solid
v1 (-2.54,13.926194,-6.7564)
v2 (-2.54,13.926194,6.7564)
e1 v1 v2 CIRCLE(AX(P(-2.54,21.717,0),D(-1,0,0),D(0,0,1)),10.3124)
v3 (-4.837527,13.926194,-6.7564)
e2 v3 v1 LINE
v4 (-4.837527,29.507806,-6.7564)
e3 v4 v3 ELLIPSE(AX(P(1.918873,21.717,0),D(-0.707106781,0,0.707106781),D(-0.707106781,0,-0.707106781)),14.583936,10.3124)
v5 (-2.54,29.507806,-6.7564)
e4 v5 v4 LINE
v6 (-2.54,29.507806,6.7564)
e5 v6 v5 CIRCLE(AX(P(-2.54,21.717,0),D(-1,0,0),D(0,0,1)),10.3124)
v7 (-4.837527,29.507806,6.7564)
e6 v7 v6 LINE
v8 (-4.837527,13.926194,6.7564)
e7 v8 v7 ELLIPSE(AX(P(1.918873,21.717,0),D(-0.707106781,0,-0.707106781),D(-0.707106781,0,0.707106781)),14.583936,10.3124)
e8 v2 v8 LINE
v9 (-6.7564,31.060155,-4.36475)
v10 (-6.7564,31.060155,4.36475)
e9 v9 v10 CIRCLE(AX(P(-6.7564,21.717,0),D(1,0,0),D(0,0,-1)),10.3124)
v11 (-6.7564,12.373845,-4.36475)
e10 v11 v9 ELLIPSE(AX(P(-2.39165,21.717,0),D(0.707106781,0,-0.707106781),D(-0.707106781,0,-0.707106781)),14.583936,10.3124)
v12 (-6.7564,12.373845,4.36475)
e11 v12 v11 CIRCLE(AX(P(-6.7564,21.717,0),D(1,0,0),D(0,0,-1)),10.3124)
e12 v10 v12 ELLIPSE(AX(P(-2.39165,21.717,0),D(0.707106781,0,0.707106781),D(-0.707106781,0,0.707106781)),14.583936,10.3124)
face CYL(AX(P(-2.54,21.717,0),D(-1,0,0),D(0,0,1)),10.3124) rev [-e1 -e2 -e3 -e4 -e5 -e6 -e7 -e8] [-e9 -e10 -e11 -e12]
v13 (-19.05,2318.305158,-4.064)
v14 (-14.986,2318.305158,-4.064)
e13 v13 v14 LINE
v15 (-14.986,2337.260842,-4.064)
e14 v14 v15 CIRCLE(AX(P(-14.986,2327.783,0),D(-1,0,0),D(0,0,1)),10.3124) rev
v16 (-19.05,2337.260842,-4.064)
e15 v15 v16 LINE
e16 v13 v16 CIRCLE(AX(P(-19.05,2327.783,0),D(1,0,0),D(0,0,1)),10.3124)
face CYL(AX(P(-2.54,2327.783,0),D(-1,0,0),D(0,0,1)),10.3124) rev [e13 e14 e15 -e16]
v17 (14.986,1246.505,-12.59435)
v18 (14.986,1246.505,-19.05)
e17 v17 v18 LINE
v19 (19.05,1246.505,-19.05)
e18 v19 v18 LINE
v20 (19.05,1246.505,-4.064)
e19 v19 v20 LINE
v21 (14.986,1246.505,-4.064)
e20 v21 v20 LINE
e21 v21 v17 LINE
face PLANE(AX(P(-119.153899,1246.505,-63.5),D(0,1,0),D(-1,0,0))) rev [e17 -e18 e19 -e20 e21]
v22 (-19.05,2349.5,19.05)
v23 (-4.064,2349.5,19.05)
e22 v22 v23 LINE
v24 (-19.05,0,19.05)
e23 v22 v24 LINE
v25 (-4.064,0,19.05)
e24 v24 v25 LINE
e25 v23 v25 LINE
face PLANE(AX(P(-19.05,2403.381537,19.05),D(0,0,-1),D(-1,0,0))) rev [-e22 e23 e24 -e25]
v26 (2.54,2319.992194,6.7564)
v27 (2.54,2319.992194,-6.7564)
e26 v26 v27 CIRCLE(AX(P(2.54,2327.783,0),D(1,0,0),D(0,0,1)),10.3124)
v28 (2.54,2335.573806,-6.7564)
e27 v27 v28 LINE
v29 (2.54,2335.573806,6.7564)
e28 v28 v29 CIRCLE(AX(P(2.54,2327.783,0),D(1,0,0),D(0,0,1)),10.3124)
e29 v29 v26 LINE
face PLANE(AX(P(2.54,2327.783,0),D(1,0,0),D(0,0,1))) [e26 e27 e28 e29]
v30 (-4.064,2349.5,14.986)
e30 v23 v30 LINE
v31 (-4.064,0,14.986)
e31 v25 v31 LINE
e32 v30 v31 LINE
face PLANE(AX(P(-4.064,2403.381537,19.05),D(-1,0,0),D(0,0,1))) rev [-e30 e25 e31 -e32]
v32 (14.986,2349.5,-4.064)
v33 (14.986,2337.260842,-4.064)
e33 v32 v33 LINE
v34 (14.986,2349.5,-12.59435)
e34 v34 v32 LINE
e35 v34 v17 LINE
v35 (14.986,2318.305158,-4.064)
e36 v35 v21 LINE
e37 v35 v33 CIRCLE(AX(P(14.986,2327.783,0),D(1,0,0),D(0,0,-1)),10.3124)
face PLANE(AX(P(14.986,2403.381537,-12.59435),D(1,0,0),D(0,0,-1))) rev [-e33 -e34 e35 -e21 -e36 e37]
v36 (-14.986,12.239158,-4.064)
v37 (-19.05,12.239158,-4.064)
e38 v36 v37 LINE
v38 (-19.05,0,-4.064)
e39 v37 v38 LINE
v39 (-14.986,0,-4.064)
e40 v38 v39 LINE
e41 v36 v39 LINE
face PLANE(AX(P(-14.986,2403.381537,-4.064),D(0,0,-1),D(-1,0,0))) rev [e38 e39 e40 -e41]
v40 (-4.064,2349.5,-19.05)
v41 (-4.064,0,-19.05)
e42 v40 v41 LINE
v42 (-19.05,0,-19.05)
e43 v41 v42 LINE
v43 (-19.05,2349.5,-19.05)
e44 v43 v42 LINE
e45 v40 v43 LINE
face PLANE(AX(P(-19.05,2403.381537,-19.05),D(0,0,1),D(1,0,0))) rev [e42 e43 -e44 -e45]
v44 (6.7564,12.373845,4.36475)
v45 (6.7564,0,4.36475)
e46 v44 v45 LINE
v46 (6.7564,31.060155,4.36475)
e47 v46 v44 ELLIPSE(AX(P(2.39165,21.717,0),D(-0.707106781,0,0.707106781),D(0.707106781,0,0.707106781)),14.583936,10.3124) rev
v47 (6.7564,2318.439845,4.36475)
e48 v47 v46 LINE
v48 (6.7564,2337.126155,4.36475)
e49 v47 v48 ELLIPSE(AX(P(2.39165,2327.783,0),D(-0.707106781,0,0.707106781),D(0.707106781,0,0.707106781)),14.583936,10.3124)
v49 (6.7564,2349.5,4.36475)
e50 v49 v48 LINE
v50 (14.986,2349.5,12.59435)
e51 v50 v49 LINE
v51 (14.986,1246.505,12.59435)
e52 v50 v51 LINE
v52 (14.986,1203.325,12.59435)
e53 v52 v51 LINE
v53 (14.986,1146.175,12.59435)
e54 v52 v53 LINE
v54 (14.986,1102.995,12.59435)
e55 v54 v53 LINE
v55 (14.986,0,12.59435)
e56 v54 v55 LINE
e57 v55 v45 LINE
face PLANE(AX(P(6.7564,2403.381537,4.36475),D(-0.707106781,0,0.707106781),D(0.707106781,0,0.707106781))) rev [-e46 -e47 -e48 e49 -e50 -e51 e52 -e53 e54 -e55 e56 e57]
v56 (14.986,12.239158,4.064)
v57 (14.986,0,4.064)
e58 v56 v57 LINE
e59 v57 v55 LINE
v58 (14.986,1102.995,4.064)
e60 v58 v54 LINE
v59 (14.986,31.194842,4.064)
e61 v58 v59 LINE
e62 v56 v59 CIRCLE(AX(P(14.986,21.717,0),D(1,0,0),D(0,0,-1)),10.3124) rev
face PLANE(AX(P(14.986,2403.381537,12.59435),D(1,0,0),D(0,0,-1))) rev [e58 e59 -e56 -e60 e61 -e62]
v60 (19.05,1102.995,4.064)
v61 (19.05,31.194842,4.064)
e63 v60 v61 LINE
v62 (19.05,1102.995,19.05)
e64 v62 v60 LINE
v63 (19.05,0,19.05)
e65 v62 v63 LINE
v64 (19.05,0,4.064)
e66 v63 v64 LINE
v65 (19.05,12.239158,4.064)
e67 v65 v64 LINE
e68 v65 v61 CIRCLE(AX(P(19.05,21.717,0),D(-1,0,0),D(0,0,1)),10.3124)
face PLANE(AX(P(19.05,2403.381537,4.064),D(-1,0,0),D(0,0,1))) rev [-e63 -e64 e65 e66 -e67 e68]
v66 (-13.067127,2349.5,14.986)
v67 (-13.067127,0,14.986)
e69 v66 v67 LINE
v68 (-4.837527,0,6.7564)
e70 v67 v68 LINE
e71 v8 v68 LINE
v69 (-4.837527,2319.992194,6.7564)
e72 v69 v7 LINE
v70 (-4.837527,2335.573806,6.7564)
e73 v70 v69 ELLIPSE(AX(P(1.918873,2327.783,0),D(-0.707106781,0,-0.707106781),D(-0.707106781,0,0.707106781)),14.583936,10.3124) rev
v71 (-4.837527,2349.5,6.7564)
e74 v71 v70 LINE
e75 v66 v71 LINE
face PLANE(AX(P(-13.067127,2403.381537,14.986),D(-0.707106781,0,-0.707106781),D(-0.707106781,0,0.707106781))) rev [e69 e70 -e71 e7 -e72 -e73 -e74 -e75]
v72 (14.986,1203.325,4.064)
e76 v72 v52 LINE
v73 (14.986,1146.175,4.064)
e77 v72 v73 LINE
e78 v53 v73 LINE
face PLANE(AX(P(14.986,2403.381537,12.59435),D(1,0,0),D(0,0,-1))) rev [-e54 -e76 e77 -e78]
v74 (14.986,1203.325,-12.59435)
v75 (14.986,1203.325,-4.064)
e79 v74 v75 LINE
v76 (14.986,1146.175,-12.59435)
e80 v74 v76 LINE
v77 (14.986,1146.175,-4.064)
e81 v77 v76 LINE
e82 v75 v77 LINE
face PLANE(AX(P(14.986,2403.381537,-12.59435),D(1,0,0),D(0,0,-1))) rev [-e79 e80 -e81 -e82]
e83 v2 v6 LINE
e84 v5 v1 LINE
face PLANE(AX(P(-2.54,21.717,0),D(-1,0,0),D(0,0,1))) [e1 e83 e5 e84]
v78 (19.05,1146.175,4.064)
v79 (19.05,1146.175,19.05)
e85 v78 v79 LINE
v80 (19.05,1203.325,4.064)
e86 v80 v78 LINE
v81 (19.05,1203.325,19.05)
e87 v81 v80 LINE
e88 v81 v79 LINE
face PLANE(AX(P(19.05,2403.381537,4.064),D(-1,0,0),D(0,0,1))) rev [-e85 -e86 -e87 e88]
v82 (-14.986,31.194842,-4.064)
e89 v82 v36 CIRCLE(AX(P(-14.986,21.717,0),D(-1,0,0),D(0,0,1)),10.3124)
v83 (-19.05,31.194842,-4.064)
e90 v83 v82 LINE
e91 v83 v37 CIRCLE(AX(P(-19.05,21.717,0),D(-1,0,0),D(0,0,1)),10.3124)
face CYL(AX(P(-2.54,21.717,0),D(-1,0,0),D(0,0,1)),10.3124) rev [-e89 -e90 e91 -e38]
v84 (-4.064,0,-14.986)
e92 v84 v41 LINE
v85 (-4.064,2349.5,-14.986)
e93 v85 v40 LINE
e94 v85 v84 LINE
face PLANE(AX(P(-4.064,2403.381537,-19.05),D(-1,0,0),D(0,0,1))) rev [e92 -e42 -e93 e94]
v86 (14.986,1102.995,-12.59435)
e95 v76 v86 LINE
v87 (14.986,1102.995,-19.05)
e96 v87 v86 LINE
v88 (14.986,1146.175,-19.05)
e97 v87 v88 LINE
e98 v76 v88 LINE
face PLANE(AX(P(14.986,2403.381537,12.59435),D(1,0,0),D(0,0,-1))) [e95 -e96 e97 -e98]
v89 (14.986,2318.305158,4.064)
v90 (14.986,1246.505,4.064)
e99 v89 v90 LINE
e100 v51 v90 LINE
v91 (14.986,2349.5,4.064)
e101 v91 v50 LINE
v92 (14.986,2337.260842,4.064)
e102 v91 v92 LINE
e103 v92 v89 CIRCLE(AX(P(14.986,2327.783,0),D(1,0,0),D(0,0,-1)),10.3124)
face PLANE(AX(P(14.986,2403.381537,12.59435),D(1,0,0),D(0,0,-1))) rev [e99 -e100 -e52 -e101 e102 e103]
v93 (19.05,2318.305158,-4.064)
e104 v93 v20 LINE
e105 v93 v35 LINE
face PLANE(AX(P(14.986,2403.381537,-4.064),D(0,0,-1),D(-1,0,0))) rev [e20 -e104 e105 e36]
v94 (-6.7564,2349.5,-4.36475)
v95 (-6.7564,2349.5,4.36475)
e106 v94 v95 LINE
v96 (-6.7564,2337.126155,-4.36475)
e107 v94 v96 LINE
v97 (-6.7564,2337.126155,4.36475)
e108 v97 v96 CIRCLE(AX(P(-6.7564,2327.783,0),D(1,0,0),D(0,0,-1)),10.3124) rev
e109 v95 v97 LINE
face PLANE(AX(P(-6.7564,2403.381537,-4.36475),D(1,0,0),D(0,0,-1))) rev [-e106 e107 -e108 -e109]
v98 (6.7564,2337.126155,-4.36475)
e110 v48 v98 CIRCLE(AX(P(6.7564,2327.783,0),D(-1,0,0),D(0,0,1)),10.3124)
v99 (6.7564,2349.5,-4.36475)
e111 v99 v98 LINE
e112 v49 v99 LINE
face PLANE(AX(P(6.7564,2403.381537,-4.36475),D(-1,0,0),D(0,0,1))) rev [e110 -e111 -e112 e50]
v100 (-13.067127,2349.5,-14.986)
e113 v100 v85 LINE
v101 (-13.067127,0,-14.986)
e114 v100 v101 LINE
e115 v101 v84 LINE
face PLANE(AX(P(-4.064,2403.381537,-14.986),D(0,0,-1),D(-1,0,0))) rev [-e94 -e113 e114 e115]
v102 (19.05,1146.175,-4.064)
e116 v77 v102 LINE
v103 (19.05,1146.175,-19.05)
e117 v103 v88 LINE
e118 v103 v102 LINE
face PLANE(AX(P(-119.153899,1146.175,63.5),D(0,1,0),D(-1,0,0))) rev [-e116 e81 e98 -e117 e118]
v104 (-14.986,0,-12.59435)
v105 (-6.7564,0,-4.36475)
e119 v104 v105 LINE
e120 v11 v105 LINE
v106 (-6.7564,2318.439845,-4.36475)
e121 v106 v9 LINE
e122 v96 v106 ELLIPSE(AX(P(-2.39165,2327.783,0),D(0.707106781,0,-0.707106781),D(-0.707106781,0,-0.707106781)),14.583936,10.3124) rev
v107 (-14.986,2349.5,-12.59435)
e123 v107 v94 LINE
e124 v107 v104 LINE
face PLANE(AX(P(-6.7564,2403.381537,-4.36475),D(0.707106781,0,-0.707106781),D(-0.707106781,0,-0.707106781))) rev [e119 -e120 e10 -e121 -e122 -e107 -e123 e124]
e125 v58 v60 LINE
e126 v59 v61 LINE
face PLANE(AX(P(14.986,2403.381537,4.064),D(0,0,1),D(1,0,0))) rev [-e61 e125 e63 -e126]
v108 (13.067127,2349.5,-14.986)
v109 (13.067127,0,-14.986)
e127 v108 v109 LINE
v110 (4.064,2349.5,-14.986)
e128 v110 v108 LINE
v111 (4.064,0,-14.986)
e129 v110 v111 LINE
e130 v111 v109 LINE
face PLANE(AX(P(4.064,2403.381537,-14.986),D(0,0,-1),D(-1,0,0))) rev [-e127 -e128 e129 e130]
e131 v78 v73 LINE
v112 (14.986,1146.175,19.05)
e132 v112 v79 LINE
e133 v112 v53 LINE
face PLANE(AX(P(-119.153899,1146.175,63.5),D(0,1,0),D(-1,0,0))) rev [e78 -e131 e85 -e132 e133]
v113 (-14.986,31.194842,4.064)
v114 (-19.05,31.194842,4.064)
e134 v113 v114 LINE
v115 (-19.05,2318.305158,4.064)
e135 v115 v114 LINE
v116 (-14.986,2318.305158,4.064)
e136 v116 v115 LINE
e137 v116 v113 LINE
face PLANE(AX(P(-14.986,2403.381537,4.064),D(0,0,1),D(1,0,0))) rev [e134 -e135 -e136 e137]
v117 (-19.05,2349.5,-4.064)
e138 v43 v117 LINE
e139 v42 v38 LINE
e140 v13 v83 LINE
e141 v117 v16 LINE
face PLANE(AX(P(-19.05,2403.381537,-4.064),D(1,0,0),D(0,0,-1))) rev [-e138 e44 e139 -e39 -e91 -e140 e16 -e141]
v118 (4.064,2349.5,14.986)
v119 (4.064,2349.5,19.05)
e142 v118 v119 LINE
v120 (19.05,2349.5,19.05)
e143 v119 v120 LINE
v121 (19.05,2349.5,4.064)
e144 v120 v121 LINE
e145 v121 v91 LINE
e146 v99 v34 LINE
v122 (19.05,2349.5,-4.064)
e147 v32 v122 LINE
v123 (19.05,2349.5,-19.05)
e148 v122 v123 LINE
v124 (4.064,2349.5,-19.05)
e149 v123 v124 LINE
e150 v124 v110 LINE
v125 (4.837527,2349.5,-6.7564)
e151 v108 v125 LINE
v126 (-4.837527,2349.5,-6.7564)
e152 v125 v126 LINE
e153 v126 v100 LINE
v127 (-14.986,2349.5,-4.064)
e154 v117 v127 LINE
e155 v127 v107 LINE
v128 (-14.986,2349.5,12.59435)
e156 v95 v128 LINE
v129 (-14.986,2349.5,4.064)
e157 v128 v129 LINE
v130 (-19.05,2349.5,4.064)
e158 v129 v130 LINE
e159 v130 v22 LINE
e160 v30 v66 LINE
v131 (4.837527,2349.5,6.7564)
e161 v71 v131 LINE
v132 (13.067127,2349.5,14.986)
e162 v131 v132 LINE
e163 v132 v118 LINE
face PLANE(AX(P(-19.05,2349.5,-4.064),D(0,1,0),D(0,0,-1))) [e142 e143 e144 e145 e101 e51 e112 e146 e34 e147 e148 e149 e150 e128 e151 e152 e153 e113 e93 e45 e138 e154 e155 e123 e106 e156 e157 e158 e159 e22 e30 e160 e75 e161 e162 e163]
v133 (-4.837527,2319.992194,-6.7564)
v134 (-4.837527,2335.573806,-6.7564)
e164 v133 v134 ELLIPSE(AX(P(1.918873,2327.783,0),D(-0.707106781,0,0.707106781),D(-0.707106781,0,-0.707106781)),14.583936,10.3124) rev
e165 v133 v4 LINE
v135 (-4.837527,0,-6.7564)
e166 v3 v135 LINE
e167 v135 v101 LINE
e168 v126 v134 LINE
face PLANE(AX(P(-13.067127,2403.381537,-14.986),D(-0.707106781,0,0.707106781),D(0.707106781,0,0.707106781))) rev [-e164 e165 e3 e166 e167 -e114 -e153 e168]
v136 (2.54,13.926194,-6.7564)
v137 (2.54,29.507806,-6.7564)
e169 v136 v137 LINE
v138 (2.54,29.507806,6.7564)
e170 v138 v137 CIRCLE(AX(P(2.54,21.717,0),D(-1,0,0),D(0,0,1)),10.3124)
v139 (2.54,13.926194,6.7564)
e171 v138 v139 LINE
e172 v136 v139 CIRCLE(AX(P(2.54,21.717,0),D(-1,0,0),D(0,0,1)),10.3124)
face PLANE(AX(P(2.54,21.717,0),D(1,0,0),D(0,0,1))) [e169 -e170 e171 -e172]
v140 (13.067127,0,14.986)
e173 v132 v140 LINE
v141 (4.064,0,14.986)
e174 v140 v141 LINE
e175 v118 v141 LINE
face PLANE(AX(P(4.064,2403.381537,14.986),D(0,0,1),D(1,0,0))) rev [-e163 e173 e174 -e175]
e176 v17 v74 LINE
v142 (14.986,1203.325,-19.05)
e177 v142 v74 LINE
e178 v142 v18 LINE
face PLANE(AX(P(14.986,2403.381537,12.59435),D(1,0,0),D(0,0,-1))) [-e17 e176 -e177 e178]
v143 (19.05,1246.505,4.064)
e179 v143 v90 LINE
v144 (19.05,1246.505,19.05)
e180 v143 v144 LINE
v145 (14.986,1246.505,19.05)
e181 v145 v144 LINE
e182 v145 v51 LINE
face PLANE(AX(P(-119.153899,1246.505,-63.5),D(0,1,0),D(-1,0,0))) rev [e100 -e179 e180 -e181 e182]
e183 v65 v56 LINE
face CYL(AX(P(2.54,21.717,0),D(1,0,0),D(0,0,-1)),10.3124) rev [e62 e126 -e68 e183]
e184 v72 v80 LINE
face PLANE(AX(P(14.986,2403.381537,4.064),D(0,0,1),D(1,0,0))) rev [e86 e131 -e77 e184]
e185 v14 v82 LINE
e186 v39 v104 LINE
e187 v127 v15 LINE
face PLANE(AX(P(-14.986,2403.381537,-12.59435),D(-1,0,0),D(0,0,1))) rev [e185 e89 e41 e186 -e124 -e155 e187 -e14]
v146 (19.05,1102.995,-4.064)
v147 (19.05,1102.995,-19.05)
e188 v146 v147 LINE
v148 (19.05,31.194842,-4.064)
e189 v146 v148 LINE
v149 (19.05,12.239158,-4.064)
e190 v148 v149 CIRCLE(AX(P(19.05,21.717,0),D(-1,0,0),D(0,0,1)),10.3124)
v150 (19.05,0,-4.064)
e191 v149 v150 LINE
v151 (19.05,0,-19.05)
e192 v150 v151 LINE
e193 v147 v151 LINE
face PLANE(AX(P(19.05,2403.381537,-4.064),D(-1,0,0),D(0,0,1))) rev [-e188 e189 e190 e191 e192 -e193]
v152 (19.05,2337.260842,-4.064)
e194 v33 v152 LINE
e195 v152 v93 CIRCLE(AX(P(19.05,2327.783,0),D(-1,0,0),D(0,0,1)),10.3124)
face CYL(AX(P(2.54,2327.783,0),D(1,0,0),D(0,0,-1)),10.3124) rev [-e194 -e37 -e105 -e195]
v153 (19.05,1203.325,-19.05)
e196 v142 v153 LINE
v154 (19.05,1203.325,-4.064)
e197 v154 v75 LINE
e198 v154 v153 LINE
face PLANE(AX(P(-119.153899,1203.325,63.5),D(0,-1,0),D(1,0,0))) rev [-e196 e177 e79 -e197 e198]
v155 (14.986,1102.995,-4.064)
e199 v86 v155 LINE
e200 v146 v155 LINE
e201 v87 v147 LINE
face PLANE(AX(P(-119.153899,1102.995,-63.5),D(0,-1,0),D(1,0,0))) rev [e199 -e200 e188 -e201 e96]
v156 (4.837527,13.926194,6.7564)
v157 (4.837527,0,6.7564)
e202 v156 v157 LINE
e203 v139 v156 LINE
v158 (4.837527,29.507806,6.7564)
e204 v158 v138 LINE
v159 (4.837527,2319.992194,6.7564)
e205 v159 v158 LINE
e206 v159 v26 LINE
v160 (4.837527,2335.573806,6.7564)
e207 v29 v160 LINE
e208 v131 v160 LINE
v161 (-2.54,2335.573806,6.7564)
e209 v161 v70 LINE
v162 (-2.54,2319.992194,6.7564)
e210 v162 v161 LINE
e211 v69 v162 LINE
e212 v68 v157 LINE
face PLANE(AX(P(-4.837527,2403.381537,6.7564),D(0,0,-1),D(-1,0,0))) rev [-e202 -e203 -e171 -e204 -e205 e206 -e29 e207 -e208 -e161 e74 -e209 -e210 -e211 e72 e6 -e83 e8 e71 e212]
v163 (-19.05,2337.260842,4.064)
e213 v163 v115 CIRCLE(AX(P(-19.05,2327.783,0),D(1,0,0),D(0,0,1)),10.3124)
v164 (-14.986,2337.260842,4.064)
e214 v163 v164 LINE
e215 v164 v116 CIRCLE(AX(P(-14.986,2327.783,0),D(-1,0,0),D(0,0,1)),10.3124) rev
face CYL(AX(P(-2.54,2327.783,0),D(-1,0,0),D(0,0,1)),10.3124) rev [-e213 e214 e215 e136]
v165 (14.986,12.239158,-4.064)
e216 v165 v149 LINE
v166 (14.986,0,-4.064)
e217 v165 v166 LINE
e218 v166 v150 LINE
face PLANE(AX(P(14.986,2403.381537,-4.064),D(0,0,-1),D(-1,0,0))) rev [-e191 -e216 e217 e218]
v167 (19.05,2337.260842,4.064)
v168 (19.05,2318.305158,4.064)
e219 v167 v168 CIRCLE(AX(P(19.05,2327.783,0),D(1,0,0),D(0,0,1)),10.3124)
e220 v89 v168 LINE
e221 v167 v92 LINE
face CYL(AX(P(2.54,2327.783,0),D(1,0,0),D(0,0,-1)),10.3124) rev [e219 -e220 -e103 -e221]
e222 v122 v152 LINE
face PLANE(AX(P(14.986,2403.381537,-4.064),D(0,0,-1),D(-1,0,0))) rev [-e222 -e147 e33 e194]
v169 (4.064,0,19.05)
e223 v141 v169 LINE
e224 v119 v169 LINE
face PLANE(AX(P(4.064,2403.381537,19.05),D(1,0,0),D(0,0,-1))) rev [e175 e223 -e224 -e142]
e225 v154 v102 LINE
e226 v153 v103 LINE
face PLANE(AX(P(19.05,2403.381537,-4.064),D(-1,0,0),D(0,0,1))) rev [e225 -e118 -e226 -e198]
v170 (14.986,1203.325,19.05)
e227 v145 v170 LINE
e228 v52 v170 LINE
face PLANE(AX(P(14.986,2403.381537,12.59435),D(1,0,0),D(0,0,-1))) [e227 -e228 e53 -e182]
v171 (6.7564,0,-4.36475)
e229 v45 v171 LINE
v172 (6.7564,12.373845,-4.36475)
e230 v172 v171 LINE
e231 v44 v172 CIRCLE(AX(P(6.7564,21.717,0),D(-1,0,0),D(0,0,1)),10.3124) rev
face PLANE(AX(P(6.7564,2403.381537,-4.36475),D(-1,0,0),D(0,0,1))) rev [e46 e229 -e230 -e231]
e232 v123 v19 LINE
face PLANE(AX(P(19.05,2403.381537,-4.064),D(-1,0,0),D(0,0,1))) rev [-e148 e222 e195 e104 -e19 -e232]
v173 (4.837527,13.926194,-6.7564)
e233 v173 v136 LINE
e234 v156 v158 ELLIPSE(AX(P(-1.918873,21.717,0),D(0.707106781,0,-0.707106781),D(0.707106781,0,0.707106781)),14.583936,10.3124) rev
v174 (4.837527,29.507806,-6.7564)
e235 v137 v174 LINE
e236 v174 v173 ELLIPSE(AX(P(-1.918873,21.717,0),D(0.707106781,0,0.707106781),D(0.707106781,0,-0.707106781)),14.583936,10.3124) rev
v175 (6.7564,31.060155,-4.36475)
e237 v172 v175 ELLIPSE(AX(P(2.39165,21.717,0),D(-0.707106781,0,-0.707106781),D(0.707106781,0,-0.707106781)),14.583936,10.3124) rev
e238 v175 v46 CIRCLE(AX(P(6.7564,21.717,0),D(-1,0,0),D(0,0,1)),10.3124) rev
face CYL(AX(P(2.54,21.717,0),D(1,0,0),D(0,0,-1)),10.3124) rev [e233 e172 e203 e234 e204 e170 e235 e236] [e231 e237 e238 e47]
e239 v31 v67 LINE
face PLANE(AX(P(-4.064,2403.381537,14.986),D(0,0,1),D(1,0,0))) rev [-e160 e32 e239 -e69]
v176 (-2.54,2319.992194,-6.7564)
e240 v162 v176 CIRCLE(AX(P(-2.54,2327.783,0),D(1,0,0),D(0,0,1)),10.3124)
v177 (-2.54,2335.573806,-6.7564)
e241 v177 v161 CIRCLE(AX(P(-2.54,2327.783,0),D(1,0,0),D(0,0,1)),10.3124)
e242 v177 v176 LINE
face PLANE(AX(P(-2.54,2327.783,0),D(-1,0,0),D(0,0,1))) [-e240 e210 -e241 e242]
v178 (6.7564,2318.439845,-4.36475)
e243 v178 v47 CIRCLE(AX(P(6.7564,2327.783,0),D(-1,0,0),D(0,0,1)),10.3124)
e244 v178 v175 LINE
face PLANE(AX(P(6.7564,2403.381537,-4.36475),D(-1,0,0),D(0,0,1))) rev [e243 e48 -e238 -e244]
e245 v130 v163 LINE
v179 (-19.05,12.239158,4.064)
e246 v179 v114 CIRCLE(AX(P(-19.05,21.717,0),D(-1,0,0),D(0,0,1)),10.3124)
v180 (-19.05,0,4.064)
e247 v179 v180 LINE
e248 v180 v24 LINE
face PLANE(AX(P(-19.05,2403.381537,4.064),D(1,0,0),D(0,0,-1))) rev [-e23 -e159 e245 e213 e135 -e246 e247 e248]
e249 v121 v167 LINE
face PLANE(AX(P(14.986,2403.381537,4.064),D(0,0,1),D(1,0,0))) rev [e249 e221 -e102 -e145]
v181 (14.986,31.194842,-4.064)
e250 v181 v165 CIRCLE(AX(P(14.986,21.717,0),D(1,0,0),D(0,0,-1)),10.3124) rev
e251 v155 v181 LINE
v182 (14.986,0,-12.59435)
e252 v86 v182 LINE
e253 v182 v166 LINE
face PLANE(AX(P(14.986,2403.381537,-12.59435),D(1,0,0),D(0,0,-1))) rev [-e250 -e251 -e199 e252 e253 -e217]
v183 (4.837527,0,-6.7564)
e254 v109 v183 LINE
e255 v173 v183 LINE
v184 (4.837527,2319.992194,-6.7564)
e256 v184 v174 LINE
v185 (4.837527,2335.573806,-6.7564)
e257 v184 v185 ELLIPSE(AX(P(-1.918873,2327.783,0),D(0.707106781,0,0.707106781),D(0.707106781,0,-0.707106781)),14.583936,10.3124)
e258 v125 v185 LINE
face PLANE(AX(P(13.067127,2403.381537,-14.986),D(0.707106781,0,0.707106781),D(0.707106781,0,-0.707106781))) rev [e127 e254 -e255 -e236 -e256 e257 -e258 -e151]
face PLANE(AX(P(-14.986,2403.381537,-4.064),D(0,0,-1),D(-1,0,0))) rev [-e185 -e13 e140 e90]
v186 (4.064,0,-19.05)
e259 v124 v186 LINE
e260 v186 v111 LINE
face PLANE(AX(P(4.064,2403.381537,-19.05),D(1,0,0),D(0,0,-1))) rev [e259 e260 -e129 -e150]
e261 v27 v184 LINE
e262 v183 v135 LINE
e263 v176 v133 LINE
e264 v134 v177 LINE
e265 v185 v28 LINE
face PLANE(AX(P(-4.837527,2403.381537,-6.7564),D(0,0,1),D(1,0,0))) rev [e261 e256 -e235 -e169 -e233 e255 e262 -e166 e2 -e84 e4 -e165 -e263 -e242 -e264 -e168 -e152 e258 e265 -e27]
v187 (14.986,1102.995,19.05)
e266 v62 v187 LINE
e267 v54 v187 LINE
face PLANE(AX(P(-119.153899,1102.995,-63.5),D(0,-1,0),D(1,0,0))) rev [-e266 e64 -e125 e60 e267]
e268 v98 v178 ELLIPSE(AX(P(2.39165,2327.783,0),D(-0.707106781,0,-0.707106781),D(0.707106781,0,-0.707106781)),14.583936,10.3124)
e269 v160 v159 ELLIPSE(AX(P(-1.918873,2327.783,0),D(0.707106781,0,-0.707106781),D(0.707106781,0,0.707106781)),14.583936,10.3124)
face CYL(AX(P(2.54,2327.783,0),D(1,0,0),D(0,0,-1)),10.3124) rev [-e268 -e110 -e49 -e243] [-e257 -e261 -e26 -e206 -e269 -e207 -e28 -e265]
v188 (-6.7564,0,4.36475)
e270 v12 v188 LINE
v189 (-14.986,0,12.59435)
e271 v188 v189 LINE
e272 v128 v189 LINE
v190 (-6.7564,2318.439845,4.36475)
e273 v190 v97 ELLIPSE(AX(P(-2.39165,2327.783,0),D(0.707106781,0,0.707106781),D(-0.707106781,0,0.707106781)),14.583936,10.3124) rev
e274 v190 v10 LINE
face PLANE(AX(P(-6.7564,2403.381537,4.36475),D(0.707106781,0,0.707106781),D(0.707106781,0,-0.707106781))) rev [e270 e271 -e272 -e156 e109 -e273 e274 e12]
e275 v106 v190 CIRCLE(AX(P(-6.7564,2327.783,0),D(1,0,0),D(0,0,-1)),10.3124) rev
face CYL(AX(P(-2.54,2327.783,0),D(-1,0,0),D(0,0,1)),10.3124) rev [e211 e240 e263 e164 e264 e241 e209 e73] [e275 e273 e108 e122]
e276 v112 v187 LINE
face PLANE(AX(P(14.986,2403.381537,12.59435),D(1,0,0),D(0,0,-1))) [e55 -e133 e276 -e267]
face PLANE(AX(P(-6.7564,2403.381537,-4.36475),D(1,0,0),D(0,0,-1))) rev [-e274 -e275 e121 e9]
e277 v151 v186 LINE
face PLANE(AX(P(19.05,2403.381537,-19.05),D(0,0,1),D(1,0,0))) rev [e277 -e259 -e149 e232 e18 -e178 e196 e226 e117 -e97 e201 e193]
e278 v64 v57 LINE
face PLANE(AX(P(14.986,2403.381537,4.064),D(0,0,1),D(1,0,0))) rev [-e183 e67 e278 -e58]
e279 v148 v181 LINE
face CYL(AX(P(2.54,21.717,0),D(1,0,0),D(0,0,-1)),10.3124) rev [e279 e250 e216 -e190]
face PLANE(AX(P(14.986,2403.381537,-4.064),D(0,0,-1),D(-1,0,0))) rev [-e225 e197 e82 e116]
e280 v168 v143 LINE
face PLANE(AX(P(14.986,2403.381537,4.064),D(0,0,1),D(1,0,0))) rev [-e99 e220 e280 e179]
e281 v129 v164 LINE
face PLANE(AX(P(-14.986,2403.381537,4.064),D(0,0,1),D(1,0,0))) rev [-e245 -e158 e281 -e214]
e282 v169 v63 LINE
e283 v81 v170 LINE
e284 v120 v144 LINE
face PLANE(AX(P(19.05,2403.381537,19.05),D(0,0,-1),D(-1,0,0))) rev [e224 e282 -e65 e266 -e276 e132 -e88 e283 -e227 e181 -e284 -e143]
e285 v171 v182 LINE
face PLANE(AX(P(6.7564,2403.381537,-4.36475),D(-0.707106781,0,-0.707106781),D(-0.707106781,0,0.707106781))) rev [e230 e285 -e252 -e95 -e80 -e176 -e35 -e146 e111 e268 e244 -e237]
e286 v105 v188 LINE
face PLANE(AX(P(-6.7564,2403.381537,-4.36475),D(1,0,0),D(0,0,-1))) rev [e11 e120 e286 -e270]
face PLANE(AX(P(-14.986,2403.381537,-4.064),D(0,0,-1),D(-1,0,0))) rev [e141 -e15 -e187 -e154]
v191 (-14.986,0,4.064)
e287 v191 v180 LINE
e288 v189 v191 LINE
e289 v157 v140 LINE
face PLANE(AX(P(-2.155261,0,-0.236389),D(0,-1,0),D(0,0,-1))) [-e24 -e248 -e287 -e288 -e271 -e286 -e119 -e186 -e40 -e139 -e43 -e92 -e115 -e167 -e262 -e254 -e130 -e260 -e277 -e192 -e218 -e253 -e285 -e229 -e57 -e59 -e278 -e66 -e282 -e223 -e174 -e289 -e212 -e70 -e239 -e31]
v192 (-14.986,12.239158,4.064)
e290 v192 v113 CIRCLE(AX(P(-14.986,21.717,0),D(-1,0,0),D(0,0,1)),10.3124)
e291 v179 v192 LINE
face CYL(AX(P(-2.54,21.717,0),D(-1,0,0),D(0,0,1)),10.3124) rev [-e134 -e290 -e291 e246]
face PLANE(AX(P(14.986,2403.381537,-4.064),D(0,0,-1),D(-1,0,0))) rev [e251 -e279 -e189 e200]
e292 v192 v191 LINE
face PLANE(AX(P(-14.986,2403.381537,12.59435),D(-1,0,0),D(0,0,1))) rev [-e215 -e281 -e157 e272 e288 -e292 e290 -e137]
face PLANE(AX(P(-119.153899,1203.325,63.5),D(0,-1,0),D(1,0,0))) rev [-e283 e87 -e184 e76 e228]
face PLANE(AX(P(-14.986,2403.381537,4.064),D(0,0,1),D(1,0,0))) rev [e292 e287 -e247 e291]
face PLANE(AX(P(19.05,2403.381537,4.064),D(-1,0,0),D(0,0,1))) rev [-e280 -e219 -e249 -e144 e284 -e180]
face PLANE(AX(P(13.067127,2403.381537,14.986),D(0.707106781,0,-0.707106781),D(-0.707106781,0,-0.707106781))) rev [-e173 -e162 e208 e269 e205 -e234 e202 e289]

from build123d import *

# Parameters (mm, degrees)
EXTRUDE1_DEPTH          = 2349.5
SKETCH2_W               = 127
SKETCH2_H               = 43.18
EXTRUDE2_DEPTH          = 4.064
SKETCH3_R               = 10.3124
CUT_EXTRUDE1_DEPTH      = 16.51
MIRROR2_COPY_1_SKETCH_R = 10.3124
MIRROR2_COPY_1_DEPTH    = 16.51


# Read off the part's stored shape, not the designer's step: 1515<1>
with BuildPart() as part:
    # Sketch1<2> → Extrude1 (new body)
    with BuildSketch(Plane(origin=(0, 0, 0), x_dir=(1, 0, 0), z_dir=(0, 1, 0))):
        Polygon((-6.7564, 4.364749804), (-6.7564, -4.364749804), (-14.986, -12.594349804), (-14.986, -4.064), (-19.05, -4.064), (-19.05, -19.05), (-4.064, -19.05), (-4.064, -14.986), (-13.067127258, -14.986), (-4.837527258, -6.7564), (4.837527258, -6.7564), (13.067127258, -14.986), (4.064, -14.986), (4.064, -19.05), (19.05, -19.05), (19.05, -4.064), (14.986, -4.064), (14.986, -12.594349804), (6.7564, -4.364749804), (6.7564, 4.364749804), (14.986, 12.594349804), (14.986, 4.064), (19.05, 4.064), (19.05, 19.05), (4.064, 19.05), (4.064, 14.986), (13.067127258, 14.986), (4.837527258, 6.7564), (-4.837527258, 6.7564), (-13.067127258, 14.986), (-4.064, 14.986), (-4.064, 19.05), (-19.05, 19.05), (-19.05, 4.064), (-14.986, 4.064), (-14.986, 12.594349804), align=None)
    extrude(amount=EXTRUDE1_DEPTH)

    # Sketch2 → Extrude2 (cut)
    with BuildSketch(Plane(origin=(19.05, 0, 0), x_dir=(0, 0, -1), z_dir=(1, 0, 0))):
        with Locations((0, 1224.915)):
            Rectangle(SKETCH2_W, SKETCH2_H)
        with Locations((0, 1124.585)):
            Rectangle(SKETCH2_W, SKETCH2_H)
    extrude(amount=-EXTRUDE2_DEPTH, mode=Mode.SUBTRACT)

    # Sketch3 → Cut-Extrude1 (cut)
    with BuildSketch(Plane.ZY.offset(19.05)):
        with Locations(Location((0, 21.717, 0), (0, 0, 310.932724574))):
            Circle(SKETCH3_R)
    cut_extrude1 = extrude(amount=-CUT_EXTRUDE1_DEPTH, mode=Mode.SUBTRACT)

    # Mirror1: Cut-Extrude1 across plane
    add(cut_extrude1.mirror(Plane(origin=(0, 0, 0), x_dir=(0, 0, 1), z_dir=(1, 0, 0))), mode=Mode.SUBTRACT)

    # Mirror2: Cut-Extrude1 across plane
    add(cut_extrude1.mirror(Plane(origin=(0, 1174.75, 0), x_dir=(0, 0, 1), z_dir=(0, -1, 0))), mode=Mode.SUBTRACT)

    # Mirror2 copy 1 sketch → Mirror2 copy 1 (cut)
    with BuildSketch(Plane(origin=(19.05, 2349.5, 0), x_dir=(0, 0, 1), z_dir=(1, 0, 0))):
        with Locations(Location((0, 21.717, 0), (0, 0, 310.932724574))):
            Circle(MIRROR2_COPY_1_SKETCH_R)
    extrude(amount=-MIRROR2_COPY_1_DEPTH, mode=Mode.SUBTRACT)


solid = part.part
